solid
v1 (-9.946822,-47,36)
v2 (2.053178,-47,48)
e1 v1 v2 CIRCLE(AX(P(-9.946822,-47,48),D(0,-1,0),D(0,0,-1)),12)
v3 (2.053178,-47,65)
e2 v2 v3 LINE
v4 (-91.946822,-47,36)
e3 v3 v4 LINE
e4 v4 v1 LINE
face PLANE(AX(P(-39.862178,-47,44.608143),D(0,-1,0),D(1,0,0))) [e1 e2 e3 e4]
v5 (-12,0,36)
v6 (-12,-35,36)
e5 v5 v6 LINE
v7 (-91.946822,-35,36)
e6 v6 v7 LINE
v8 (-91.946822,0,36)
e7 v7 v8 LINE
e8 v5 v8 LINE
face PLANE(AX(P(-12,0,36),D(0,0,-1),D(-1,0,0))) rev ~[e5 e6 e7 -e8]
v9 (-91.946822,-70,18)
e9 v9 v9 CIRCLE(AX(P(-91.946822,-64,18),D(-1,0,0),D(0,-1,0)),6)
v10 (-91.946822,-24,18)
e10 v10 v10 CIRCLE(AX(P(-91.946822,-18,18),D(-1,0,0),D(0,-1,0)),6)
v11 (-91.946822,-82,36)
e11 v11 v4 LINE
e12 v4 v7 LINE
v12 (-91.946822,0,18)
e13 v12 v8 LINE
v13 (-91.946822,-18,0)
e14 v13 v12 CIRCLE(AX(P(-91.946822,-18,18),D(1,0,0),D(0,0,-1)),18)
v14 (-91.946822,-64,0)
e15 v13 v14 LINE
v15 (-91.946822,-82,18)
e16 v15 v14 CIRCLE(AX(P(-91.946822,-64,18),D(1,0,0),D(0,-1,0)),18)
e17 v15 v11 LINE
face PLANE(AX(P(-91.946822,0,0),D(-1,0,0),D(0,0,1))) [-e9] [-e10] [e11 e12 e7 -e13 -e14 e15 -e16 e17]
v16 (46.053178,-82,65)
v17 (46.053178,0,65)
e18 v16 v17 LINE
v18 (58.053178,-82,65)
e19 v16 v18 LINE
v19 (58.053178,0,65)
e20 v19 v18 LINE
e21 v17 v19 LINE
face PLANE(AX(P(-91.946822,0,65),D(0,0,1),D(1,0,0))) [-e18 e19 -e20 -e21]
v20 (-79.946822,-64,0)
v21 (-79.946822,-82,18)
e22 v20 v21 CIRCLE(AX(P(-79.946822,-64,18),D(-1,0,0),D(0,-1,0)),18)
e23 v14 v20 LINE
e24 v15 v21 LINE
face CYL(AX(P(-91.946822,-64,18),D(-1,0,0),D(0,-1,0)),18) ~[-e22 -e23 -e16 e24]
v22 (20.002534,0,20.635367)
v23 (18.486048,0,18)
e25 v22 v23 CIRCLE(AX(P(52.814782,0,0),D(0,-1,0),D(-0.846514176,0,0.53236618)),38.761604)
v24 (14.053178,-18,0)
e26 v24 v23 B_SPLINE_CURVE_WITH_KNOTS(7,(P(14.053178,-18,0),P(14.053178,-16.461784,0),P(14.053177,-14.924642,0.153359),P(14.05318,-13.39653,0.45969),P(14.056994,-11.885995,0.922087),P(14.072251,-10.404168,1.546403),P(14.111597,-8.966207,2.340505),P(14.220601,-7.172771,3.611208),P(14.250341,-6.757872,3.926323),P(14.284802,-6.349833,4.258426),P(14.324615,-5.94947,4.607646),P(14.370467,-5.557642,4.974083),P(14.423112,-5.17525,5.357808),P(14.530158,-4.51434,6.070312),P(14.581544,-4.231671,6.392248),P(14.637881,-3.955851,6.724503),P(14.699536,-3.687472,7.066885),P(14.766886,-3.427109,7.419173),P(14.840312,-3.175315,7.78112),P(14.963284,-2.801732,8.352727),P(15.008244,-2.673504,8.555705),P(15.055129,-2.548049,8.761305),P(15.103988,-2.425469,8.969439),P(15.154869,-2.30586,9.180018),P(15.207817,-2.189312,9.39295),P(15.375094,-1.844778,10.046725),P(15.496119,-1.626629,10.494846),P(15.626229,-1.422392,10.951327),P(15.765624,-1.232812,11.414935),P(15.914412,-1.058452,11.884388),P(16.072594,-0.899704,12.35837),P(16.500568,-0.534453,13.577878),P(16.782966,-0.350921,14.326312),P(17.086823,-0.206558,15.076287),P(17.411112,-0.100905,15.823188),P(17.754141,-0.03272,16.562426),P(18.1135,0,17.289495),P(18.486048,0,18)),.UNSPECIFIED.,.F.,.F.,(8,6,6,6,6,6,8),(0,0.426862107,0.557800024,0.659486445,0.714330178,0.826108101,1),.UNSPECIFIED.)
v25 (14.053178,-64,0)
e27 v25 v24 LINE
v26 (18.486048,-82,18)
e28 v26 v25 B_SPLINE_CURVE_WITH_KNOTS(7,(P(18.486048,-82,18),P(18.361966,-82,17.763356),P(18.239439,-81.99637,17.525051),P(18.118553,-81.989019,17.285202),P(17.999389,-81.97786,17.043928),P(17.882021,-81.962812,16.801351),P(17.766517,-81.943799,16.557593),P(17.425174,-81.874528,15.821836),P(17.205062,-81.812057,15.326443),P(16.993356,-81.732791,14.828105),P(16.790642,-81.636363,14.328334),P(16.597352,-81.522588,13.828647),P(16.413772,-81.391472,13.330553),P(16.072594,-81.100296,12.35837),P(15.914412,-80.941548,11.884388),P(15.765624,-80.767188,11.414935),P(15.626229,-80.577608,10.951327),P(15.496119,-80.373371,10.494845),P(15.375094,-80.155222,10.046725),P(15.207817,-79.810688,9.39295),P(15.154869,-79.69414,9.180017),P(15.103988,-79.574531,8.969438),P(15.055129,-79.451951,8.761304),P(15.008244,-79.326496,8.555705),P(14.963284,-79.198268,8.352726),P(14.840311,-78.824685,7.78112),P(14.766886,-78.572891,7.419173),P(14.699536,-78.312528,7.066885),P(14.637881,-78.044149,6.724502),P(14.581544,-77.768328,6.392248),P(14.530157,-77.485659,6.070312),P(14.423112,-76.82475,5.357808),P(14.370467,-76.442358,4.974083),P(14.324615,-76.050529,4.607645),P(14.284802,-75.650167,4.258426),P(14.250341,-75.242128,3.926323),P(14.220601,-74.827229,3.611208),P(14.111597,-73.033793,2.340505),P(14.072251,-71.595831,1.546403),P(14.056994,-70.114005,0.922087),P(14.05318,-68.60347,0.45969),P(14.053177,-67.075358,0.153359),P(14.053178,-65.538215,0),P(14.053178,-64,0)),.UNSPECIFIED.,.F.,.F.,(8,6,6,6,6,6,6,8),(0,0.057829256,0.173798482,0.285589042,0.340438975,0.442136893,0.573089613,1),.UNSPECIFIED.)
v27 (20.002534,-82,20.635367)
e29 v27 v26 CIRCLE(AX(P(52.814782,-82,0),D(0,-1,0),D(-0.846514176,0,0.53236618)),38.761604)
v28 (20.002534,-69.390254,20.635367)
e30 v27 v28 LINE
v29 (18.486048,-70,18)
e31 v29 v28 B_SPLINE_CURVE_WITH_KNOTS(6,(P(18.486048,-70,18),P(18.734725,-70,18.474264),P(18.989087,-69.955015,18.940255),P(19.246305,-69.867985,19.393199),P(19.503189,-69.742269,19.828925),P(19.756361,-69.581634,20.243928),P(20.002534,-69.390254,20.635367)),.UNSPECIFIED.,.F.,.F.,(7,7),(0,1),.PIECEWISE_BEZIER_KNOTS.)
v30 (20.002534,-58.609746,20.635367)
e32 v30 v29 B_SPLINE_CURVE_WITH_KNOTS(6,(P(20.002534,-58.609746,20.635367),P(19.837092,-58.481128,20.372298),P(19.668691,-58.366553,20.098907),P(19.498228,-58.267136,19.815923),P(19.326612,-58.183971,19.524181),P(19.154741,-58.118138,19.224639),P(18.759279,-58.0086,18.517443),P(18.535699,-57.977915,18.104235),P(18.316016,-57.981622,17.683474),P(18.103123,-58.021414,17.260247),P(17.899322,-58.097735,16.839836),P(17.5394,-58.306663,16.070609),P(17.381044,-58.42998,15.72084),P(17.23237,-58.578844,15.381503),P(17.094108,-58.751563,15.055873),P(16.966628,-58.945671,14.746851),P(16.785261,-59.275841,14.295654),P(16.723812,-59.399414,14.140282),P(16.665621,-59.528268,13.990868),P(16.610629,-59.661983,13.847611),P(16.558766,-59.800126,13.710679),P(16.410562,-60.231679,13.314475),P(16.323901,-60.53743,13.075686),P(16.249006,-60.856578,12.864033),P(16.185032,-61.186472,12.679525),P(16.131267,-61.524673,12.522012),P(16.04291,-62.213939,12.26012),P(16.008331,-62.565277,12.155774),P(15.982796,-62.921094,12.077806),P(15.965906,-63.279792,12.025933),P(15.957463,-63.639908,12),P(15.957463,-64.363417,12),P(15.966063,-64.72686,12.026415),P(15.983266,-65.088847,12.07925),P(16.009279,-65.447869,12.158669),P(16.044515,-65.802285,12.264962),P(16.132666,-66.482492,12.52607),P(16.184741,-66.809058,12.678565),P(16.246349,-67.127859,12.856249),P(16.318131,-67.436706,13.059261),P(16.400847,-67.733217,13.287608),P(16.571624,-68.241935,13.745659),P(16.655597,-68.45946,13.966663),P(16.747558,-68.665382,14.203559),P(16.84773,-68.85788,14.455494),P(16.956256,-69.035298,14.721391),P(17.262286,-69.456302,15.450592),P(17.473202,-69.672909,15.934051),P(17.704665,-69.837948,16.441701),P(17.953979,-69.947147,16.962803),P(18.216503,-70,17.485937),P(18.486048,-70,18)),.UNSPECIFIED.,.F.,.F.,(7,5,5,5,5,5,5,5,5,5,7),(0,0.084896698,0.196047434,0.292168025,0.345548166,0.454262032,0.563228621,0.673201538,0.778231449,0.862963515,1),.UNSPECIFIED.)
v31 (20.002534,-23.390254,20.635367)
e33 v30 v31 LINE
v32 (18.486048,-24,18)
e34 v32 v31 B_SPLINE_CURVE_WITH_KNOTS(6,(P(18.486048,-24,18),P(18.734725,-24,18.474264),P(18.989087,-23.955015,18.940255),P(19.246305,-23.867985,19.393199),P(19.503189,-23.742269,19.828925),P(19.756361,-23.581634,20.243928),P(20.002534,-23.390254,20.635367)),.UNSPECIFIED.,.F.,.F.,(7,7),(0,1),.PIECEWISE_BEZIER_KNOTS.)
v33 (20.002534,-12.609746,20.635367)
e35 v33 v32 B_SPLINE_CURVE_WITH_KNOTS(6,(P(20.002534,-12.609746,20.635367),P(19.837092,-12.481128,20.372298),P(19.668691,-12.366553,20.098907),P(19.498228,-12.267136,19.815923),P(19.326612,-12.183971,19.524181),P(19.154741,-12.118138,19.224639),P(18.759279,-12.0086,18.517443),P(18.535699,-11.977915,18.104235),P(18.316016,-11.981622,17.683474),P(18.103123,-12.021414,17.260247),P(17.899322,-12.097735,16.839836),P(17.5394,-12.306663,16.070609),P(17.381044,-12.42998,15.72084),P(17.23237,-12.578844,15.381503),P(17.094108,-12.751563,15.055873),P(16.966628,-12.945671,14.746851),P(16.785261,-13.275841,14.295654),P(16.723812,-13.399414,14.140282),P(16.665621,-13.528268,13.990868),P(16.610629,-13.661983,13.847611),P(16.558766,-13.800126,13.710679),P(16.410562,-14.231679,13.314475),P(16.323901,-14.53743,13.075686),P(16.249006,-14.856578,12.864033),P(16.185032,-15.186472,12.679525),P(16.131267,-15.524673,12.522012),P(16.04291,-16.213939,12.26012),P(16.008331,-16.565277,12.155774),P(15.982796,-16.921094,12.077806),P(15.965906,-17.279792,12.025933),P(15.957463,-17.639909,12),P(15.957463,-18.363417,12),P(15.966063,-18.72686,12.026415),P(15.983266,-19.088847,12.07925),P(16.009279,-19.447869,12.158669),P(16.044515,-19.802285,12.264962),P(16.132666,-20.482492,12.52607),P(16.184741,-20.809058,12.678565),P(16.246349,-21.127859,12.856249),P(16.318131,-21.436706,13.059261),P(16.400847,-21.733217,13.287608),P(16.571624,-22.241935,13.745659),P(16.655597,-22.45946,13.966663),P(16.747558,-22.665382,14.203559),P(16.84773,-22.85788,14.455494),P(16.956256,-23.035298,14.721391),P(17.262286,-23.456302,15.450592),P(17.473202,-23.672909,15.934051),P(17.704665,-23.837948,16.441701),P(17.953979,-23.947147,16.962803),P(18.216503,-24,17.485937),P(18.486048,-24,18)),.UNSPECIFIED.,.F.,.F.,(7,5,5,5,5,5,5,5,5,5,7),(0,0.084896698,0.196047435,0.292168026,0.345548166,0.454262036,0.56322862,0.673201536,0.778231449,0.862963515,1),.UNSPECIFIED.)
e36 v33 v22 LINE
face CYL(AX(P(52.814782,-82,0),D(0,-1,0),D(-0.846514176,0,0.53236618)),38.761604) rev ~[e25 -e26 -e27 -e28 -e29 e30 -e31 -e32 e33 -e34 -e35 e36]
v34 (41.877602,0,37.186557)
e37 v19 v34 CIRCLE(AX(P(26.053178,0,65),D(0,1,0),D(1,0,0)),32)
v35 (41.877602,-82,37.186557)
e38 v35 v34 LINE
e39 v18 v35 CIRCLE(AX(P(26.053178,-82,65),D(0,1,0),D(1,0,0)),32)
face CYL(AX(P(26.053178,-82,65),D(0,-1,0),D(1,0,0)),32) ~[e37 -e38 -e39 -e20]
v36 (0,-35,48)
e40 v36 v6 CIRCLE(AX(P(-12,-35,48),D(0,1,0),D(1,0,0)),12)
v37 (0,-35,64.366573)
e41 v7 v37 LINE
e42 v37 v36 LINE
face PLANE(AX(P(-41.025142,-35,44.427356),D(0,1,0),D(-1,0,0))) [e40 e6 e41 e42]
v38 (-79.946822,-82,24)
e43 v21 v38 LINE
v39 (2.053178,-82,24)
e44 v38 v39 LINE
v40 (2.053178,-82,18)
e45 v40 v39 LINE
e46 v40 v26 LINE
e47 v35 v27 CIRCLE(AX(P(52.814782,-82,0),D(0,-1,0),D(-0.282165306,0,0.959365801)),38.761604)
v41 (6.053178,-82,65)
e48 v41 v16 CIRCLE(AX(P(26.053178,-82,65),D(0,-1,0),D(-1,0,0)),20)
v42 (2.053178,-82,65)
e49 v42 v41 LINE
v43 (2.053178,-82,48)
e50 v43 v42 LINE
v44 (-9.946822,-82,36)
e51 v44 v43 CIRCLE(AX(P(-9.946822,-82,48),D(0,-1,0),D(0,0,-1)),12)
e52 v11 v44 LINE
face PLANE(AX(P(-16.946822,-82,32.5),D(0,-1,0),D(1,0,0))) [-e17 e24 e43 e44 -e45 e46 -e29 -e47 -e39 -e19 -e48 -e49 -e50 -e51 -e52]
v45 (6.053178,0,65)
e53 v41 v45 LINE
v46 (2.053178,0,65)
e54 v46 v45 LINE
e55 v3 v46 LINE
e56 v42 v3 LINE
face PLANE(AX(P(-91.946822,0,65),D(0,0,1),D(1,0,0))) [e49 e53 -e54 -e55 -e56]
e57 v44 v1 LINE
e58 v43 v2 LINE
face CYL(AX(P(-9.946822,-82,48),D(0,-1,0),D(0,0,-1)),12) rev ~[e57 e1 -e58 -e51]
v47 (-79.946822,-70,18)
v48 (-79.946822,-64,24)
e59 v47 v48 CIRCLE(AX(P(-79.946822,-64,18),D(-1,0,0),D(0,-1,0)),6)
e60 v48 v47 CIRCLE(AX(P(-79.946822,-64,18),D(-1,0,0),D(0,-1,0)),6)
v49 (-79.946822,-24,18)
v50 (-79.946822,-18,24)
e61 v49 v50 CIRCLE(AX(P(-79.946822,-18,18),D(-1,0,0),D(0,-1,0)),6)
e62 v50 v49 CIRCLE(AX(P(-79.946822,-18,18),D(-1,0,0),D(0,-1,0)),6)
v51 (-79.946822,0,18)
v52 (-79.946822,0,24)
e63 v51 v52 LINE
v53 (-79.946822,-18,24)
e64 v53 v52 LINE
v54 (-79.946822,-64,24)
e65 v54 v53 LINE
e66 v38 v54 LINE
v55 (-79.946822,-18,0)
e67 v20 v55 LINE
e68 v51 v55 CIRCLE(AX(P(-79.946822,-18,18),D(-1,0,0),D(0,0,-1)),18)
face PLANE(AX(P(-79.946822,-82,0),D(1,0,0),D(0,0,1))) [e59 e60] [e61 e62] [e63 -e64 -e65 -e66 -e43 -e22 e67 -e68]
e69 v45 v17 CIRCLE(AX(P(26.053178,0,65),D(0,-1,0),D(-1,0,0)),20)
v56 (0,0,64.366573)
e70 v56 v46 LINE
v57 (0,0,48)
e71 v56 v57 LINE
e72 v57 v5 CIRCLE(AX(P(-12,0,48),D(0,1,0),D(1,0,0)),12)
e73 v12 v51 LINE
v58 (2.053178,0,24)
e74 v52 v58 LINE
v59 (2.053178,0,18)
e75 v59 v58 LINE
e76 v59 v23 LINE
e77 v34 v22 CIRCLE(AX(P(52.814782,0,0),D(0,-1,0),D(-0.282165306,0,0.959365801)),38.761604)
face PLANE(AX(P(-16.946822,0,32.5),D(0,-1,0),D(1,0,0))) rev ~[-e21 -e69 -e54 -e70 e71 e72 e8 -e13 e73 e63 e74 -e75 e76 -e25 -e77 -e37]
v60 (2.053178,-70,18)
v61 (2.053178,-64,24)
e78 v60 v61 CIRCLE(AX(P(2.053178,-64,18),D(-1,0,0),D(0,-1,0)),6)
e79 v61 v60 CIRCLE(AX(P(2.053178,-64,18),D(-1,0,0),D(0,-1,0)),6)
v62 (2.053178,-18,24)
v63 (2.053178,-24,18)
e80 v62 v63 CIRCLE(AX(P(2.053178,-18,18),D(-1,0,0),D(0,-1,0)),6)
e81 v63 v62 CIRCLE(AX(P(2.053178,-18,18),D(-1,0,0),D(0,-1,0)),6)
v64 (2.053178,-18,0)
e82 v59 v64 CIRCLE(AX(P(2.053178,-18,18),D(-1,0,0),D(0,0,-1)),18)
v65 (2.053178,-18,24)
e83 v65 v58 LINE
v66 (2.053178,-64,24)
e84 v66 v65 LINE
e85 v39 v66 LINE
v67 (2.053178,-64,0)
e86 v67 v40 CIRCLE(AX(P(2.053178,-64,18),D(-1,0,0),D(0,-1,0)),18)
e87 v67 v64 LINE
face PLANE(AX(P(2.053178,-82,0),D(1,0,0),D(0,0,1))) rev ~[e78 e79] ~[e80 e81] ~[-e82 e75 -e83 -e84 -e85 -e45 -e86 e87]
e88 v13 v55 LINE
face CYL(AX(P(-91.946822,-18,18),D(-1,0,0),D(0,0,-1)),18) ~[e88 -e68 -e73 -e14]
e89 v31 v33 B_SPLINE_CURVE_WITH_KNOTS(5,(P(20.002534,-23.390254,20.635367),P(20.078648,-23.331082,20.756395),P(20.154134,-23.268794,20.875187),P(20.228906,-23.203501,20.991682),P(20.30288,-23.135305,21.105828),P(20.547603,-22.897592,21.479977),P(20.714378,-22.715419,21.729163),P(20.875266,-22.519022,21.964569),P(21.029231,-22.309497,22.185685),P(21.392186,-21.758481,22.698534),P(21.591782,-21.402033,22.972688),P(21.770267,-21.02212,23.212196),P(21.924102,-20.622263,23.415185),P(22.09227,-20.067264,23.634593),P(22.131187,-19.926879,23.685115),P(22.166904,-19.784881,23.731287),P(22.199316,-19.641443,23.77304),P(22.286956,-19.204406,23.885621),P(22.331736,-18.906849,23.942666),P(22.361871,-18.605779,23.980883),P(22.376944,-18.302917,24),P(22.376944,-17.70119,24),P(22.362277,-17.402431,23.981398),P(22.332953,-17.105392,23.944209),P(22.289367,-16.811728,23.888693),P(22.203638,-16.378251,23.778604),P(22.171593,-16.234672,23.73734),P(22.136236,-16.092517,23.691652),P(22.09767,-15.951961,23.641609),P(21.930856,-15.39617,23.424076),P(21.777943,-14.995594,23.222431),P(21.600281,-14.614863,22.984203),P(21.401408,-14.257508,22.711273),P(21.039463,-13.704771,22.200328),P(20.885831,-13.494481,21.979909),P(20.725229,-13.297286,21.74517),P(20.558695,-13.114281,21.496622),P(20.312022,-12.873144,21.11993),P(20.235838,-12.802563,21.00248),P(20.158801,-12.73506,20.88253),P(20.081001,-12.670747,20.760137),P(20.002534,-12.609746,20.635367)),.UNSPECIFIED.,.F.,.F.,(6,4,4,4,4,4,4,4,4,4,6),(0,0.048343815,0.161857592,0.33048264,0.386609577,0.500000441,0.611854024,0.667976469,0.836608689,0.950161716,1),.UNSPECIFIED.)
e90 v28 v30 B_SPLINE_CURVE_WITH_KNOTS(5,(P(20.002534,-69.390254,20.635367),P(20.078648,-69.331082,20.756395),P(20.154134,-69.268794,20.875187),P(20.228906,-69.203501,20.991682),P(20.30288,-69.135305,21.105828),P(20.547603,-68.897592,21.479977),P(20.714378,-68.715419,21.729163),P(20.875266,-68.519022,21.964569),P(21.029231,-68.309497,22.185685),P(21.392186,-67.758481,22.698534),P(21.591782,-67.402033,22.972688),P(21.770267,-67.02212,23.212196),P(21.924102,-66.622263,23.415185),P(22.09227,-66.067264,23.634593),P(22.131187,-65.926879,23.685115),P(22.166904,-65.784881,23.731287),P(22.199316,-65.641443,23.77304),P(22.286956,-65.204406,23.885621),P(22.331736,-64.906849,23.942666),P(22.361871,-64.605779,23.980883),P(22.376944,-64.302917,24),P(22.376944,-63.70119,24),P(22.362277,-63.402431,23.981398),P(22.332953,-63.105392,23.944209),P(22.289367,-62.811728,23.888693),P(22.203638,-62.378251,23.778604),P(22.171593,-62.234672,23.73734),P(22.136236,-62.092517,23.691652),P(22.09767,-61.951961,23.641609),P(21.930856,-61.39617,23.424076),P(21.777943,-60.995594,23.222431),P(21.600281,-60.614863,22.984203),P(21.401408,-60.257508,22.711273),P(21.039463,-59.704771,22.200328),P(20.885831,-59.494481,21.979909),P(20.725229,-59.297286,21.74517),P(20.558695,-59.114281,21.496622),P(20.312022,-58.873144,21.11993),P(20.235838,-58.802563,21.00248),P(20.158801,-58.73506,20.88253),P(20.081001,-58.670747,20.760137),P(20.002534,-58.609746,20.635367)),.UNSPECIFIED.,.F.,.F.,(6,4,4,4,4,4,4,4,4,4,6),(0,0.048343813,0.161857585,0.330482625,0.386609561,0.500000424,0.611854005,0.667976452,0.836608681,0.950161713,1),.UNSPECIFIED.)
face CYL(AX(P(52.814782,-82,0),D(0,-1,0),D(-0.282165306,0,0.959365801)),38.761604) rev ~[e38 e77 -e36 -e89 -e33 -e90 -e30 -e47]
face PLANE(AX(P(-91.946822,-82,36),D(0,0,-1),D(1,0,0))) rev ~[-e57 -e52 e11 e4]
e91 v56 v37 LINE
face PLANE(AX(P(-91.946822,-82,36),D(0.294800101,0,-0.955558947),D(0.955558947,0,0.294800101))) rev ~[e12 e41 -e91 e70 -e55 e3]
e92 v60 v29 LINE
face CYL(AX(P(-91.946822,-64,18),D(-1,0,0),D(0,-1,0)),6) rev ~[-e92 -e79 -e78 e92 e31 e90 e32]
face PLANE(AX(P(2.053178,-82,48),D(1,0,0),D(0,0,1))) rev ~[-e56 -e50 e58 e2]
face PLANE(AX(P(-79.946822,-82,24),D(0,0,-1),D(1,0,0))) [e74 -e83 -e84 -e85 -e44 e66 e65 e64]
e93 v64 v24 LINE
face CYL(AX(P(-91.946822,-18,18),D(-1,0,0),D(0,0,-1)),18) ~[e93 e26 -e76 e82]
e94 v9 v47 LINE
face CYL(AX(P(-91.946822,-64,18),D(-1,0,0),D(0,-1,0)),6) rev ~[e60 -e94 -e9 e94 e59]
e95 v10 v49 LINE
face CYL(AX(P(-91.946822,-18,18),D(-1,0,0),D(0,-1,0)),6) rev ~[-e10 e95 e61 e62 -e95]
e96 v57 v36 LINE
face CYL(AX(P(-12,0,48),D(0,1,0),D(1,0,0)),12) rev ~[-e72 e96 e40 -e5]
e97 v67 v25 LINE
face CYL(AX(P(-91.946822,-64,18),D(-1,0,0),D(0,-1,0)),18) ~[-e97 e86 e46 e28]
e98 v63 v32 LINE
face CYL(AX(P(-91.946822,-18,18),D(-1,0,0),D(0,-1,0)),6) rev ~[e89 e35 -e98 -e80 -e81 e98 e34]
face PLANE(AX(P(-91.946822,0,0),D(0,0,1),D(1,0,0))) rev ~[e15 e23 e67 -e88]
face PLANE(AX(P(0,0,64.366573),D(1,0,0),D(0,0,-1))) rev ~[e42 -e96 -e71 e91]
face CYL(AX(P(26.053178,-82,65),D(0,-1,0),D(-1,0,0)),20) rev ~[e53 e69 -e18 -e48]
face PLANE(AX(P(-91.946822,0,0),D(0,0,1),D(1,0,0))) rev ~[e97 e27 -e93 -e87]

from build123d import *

# Parameters (mm, degrees)
F0_W      = 150
F0_H      = 65
F1_DEPTH  = 82
F10_W     = 82
F10_H     = 24
F2_DEPTH  = 82
F3_DEPTH  = 82
F4_DEPTH  = 82
F5_DEPTH  = 35
F7_DEPTH  = 35
F8_R      = 6
F12_R     = 6
F13_DEPTH = 150
F14_DEPTH = 150
F9_DEPTH  = 82


# Not quite as in the source:
# - a feature names something its author has since deleted; it is built from what else it names


with BuildPart() as f1:
    # F0 (on Front) → F1 (new body)
    with BuildSketch(Plane.XZ):
        with Locations((-16.9468223028, 32.5)):
            Rectangle(F0_W, F0_H)
    extrude(amount=F1_DEPTH)

    # F10 (on face) → F2 (cut)
    with BuildSketch(Plane.XZ.offset(82)):
        with BuildLine():
            ThreePointArc((20.002534413, 20.6353670047), (15.5702030299, 10.7379376133), (14.0531776972, 0))
            Line((14.0531776972, 0), (58.0531776972, 0))
            Line((58.0531776972, 0), (58.0531776972, 65))
            ThreePointArc((58.0531776972, 65), (53.7152597827, 48.9124515634), (41.8776017786, 37.1865571621))
            ThreePointArc((41.8776017786, 37.1865571621), (37.6930401765, 19.9858202792), (20.002534413, 20.6353670047))
        make_face()
        with Locations((-38.9468223028, 12)):
            Rectangle(F10_W, F10_H)
    extrude(amount=-F2_DEPTH, mode=Mode.SUBTRACT)

    # F11 (on face) → F3 (cut)
    with BuildSketch(Plane.XZ.offset(82)):
        Polygon((-91.9468223028, 36), (2.0531776972, 65), (-91.9468223028, 65), align=None)
    extrude(amount=-F3_DEPTH, mode=Mode.SUBTRACT)

    # F11 (on face) → F4 (cut)
    with BuildSketch(Plane.XZ.offset(82)):
        Polygon((-91.9468223028, 36), (2.0531776972, 65), (-91.9468223028, 65), align=None)
    extrude(amount=-F4_DEPTH, mode=Mode.SUBTRACT)

    # F11 (on face) → F5 (cut)
    with BuildSketch(Plane.XZ.offset(82)):
        with BuildLine():
            Line((2.0531776972, 48), (2.0531776972, 65))
            Line((2.0531776972, 65), (-91.9468223028, 36))
            Line((-91.9468223028, 36), (-9.9468223028, 36))
            ThreePointArc((-9.9468223028, 36), (-1.4615409285, 39.5147186258), (2.0531776972, 48))
        make_face()
    extrude(amount=-F5_DEPTH, mode=Mode.SUBTRACT)

    # F6 (on face) → F7 (cut)
    with BuildSketch(Plane(origin=(0, 0, 0), x_dir=(-1, 0, 0), z_dir=(0, 1, 0))):
        with BuildLine():
            Line((12, 36), (91.9468223028, 36))
            Line((91.9468223028, 36), (0, 64.3665728381))
            Line((0, 64.3665728381), (0, 48))
            ThreePointArc((0, 48), (3.5147186258, 39.5147186258), (12, 36))
        make_face()
    extrude(amount=-F7_DEPTH, mode=Mode.SUBTRACT)

    # F8 (on face) + F12 (on face) → F13 (cut)
    with BuildSketch(Plane(origin=(-91.9468223028, 0, 0), x_dir=(0, -1, 0), z_dir=(-1, 0, 0))):
        with Locations((18, 18)):
            Circle(F8_R)
        with Locations((64, 18)):
            Circle(F8_R)
    with BuildSketch(Plane(origin=(-91.9468223028, 0, 0), x_dir=(0, -1, 0), z_dir=(-1, 0, 0))):
        with Locations((18, 18)):
            Circle(F12_R)
    extrude(amount=-F13_DEPTH, mode=Mode.SUBTRACT)

    # F8 (on face) → F14 (cut)
    with BuildSketch(Plane(origin=(-91.9468223028, 0, 0), x_dir=(0, -1, 0), z_dir=(-1, 0, 0))):
        with BuildLine():
            Line((0, 0), (18, 0))
            ThreePointArc((18, 0), (5.2720779386, 5.2720779386), (0, 18))
            Line((0, 18), (0, 0))
        make_face()
        with BuildLine():
            ThreePointArc((82, 18), (76.7279220614, 5.2720779386), (64, 0))
            Line((64, 0), (82, 0))
            Line((82, 0), (82, 18))
        make_face()
    extrude(amount=-F14_DEPTH, mode=Mode.SUBTRACT)

    # F10 (on face) → F9 (cut)
    with BuildSketch(Plane.XZ.offset(82)):
        with BuildLine():
            ThreePointArc((41.8776017786, 37.1865571621), (29.4269949399, 30.9107323053), (20.002534413, 20.6353670047))
            ThreePointArc((20.002534413, 20.6353670047), (37.6930401765, 19.9858202792), (41.8776017786, 37.1865571621))
        make_face()
        with BuildLine():
            ThreePointArc((20.002534413, 20.6353670047), (15.5702030299, 10.7379376133), (14.0531776972, 0))
            Line((14.0531776972, 0), (58.0531776972, 0))
            Line((58.0531776972, 0), (58.0531776972, 65))
            ThreePointArc((58.0531776972, 65), (53.7152597827, 48.9124515634), (41.8776017786, 37.1865571621))
            ThreePointArc((41.8776017786, 37.1865571621), (37.6930401765, 19.9858202792), (20.002534413, 20.6353670047))
        make_face()
        with BuildLine():
            Line((46.0531776972, 65), (6.0531776972, 65))
            ThreePointArc((6.0531776972, 65), (12.5913823165, 50.2087841904), (27.9311842099, 45.0883679338))
            ThreePointArc((27.9311842099, 45.0883679338), (40.8443935069, 51.5382046192), (46.0531776972, 65))
        make_face()
    extrude(amount=-F9_DEPTH, mode=Mode.SUBTRACT)


solid = f1.part
